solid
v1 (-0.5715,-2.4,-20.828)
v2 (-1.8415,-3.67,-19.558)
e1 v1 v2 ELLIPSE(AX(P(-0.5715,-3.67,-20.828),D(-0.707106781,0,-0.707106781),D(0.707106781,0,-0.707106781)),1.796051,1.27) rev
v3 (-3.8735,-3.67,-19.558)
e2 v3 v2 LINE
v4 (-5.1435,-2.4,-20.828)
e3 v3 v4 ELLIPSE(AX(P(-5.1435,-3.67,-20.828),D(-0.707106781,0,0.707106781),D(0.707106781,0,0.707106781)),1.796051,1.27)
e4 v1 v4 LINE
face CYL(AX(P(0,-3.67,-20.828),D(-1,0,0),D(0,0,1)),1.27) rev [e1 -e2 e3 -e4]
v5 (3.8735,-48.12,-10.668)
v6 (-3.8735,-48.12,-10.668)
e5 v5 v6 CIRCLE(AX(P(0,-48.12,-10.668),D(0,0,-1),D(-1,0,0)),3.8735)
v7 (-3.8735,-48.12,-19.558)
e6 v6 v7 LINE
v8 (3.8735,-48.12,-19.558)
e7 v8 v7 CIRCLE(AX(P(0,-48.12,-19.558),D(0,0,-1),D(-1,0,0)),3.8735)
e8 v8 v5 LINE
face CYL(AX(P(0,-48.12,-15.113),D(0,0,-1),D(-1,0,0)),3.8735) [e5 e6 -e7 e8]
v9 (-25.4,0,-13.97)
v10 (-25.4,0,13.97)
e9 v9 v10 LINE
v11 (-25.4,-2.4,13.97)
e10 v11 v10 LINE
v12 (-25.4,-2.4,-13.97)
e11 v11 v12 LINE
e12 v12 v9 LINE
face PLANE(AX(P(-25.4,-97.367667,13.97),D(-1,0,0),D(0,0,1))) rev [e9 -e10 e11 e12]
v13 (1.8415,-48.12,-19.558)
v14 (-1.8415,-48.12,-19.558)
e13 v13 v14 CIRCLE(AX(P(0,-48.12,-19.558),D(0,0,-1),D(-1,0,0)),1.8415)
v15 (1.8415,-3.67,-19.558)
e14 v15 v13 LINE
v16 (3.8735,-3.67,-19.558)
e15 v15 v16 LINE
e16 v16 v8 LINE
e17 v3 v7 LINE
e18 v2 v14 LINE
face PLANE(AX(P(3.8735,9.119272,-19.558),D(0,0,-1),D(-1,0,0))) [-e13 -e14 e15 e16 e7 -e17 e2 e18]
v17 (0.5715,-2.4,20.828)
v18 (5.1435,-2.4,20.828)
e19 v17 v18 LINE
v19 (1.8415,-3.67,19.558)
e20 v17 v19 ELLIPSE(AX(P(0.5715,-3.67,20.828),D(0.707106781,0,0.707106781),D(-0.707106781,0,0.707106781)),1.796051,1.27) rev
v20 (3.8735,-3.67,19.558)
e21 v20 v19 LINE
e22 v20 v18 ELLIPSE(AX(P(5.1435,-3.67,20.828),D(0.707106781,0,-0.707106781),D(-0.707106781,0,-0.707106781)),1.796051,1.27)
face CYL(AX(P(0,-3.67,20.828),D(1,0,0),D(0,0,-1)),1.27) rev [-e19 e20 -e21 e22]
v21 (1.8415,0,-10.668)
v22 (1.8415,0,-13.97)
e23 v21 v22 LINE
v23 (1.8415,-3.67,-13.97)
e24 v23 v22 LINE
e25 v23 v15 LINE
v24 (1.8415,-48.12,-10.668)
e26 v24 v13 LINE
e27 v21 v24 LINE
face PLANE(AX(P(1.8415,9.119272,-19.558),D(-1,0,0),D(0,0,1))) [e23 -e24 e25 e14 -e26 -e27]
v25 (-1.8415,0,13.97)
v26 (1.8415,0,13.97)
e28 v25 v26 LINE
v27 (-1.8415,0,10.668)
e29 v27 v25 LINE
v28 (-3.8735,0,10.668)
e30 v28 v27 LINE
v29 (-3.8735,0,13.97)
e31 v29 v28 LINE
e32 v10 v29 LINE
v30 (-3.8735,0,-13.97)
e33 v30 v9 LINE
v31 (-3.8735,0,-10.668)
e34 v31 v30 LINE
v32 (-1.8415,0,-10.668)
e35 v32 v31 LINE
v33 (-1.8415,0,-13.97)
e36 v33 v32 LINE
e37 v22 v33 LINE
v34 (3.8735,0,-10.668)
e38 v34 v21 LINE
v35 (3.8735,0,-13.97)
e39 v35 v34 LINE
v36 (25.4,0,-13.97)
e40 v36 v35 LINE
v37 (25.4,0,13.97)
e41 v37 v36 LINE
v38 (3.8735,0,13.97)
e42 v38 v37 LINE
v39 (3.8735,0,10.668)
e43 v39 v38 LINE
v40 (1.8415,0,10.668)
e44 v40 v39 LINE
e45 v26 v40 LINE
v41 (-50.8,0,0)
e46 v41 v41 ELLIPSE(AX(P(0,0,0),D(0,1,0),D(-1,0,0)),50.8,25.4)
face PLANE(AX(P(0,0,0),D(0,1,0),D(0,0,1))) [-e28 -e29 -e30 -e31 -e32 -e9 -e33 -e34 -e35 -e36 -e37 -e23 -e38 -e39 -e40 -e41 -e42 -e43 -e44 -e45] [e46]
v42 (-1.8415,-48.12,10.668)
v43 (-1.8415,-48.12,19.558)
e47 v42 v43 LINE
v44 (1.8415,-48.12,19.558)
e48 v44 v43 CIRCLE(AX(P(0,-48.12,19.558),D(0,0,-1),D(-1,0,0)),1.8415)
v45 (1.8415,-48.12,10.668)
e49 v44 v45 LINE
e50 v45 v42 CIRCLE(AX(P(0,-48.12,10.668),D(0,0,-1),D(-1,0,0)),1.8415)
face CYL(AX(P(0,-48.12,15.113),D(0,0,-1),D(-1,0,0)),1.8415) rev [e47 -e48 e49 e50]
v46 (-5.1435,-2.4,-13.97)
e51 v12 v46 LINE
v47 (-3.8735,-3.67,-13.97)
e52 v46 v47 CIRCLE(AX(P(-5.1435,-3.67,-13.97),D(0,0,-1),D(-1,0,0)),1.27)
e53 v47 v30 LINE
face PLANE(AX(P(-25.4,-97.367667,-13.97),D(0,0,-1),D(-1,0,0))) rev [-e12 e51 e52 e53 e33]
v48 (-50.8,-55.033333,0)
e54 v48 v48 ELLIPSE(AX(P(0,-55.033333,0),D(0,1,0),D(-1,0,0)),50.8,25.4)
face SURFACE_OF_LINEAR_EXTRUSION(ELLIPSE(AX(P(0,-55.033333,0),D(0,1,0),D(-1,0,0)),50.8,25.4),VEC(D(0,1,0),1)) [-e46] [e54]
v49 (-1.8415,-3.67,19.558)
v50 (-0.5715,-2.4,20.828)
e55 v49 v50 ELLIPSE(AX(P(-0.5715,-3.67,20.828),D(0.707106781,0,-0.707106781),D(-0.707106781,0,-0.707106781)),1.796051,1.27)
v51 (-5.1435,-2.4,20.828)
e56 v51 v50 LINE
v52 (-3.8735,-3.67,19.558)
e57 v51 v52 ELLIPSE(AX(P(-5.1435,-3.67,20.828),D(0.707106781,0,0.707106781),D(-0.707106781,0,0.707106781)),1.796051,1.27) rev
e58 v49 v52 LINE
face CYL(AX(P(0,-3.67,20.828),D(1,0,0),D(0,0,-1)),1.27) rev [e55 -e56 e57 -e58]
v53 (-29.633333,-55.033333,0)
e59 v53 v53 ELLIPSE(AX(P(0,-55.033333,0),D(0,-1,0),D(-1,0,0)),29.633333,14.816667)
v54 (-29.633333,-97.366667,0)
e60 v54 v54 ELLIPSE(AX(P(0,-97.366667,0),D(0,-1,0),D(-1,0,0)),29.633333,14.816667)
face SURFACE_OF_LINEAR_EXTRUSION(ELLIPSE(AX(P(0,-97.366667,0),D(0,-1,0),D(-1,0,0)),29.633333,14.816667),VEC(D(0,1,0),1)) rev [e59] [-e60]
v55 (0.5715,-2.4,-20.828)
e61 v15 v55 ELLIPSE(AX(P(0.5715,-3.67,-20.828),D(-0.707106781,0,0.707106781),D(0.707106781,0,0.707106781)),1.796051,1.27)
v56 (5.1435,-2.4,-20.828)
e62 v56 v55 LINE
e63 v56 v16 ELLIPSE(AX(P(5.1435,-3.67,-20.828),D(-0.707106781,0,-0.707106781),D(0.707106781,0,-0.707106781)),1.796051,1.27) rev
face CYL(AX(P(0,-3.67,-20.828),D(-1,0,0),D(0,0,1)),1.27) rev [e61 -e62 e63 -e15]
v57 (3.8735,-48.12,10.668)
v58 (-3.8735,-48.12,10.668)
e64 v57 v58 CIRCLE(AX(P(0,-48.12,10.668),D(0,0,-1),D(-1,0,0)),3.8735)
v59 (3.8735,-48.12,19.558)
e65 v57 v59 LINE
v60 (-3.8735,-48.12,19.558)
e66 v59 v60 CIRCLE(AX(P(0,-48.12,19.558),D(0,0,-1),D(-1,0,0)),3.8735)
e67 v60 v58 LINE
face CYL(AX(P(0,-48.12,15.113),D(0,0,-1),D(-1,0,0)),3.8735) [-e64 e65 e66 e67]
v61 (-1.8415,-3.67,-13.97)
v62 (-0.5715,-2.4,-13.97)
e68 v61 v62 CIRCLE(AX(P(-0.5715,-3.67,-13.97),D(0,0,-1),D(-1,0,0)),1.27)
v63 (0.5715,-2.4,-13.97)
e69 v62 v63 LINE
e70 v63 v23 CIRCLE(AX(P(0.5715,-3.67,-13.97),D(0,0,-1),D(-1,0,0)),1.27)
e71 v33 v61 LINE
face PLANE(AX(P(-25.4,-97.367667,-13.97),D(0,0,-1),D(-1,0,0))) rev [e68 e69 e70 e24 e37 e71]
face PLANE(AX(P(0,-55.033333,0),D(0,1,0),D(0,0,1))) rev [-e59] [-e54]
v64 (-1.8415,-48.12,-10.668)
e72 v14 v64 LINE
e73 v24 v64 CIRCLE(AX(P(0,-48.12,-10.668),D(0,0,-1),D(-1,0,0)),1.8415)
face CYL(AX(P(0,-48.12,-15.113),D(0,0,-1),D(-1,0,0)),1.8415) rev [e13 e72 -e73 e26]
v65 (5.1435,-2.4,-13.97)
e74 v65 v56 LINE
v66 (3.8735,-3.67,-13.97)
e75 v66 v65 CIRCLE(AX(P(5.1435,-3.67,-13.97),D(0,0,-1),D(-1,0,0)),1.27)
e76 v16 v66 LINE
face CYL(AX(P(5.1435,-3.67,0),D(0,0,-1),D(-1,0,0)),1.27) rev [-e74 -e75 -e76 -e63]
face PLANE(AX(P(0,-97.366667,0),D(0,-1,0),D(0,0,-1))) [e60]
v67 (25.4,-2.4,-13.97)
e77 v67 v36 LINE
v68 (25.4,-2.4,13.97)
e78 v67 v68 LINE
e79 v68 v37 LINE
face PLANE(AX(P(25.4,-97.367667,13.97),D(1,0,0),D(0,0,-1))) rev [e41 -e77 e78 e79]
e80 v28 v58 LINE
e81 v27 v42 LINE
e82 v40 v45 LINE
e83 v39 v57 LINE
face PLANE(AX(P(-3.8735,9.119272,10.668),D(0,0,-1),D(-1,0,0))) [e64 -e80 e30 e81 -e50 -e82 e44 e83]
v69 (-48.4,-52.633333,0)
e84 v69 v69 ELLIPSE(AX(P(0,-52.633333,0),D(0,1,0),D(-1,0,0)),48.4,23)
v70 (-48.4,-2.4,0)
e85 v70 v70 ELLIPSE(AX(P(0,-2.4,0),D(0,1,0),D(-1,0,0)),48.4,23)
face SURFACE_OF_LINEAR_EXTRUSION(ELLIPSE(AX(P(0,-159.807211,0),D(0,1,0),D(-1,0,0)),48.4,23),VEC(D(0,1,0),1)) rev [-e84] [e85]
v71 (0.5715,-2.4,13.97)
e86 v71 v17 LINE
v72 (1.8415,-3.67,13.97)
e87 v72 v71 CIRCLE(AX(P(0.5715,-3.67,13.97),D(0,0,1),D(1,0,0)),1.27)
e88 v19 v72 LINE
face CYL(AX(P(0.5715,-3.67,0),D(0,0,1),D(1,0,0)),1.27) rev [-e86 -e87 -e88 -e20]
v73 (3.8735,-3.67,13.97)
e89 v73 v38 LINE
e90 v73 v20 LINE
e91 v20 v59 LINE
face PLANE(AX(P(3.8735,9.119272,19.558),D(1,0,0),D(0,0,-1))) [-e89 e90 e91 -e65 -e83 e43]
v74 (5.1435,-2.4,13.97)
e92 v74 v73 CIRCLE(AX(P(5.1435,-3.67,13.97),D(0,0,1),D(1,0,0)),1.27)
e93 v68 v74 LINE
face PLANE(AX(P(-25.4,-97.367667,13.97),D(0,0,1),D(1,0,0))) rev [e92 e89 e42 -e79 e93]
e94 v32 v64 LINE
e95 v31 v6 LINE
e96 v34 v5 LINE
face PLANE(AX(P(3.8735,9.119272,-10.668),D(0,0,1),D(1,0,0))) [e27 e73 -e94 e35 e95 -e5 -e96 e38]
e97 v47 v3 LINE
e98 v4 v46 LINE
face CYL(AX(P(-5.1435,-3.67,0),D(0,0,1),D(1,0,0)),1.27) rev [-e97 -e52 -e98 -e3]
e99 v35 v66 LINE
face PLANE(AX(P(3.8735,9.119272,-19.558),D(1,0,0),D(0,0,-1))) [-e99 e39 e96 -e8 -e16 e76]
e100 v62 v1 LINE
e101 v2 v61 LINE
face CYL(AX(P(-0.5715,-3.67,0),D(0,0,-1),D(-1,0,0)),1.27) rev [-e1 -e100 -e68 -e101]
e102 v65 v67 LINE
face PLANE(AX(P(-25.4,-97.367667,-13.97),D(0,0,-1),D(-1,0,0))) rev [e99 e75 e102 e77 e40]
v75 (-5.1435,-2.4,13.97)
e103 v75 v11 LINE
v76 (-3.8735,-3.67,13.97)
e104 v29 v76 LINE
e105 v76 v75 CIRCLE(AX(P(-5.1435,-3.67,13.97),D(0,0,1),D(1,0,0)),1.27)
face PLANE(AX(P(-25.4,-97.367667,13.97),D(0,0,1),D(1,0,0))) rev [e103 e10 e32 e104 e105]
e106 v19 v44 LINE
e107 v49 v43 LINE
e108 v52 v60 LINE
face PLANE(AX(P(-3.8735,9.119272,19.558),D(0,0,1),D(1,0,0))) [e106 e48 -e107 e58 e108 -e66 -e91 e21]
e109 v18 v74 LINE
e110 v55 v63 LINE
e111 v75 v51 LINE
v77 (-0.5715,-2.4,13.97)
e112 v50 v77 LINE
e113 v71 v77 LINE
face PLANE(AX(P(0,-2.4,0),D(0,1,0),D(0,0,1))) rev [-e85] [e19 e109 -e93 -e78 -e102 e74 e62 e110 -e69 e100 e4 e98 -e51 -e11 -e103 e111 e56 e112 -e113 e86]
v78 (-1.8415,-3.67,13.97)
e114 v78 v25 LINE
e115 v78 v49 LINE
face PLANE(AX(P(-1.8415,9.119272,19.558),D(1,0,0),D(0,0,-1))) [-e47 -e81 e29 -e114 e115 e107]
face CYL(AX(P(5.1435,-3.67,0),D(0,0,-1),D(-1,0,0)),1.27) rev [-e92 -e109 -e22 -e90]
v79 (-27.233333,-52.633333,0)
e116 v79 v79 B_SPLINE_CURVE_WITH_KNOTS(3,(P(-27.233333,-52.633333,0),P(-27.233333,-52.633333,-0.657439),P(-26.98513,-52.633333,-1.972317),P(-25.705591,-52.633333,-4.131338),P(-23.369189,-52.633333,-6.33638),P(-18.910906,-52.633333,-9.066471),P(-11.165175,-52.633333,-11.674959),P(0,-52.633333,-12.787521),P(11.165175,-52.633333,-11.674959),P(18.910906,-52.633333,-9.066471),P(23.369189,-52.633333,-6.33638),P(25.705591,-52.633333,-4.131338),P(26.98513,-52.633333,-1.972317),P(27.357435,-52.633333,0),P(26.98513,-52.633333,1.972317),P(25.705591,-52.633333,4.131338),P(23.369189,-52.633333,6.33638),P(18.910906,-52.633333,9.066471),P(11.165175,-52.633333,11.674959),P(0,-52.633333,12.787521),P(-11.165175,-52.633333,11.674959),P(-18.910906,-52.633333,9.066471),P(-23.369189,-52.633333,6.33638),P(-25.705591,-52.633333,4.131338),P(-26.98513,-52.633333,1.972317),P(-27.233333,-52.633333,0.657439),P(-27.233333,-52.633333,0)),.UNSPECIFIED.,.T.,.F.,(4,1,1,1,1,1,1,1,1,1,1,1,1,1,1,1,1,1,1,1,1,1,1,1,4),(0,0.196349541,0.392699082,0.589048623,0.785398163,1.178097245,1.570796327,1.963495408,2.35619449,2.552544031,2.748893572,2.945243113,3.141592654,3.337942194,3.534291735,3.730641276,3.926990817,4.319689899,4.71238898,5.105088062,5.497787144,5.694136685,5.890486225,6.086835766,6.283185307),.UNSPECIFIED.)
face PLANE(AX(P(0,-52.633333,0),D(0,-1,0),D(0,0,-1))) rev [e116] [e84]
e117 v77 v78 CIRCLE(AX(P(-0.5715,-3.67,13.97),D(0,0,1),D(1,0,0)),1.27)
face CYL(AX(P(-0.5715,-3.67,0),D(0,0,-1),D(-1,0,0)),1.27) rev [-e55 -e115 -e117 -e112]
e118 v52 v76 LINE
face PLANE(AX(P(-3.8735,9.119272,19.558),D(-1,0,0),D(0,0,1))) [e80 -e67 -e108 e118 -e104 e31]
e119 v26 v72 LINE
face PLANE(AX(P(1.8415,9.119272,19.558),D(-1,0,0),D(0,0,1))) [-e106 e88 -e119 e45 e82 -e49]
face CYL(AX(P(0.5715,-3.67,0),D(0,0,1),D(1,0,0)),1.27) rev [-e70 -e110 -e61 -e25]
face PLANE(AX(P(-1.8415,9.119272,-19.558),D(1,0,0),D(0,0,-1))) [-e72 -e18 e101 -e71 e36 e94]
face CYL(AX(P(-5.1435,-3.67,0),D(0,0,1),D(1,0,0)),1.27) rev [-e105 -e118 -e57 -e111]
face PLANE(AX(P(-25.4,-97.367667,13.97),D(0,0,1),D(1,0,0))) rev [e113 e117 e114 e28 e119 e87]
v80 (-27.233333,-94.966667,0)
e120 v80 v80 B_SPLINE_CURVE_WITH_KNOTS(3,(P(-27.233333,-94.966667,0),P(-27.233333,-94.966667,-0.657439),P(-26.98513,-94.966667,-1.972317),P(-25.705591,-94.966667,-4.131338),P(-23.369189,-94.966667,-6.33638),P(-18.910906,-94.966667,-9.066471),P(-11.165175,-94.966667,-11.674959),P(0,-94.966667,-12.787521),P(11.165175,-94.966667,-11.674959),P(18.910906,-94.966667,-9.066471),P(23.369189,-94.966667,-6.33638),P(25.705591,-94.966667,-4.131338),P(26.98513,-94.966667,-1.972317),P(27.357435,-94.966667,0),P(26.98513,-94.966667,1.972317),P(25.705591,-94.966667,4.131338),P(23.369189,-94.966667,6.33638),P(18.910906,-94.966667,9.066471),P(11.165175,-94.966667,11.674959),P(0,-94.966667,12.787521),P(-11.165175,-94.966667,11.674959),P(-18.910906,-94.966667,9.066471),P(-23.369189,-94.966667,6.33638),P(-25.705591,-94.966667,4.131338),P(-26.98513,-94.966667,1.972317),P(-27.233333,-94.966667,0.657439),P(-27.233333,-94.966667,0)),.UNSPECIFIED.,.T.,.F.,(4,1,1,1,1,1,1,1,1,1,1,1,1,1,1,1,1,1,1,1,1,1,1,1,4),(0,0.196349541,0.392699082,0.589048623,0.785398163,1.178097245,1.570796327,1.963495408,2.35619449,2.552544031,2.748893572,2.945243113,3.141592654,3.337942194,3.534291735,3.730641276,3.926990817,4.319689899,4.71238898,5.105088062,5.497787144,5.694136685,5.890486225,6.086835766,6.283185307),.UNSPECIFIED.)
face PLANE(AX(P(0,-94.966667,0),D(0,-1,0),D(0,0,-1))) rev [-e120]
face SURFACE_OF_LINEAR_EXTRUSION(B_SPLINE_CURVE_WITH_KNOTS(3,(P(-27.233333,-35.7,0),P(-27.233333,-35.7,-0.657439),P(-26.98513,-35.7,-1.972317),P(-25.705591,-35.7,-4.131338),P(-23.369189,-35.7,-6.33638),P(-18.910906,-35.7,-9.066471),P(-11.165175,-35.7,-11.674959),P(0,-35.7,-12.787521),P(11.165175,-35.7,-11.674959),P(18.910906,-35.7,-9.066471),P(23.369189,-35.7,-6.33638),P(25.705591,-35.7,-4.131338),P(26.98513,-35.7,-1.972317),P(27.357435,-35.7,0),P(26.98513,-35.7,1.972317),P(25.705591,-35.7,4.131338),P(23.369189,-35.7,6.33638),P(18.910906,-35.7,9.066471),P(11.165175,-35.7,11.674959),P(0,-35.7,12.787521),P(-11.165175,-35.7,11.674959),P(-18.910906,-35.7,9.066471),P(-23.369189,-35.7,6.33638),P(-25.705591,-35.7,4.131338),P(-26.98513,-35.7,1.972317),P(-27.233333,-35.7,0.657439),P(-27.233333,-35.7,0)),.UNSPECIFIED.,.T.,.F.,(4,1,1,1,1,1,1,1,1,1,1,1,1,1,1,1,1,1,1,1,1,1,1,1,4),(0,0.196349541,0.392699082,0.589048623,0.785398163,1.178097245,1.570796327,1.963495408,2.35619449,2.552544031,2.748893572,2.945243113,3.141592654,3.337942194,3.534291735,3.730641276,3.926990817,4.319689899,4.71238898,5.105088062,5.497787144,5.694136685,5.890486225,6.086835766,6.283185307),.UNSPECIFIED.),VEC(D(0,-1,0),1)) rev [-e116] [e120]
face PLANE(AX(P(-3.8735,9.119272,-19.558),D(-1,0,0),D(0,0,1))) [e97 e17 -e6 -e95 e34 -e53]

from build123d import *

# Parameters (mm, degrees)
SKETCH3_RX          = 50.8
SKETCH3_RY          = 25.4
BOSS_EXTRUDE1_DEPTH = 55.033333333
SKETCH4_RX          = 29.633333333
SKETCH4_RY          = 14.816666667
BOSS_EXTRUDE2_DEPTH = 42.333333249
CUT_EXTRUDE1_START  = -50.233333
SKETCH5_RX          = 48.4
SKETCH5_RY          = 23
CUT_EXTRUDE1_DEPTH  = 50.233333
CUT_EXTRUDE2_START  = -42.333333249
CUT_EXTRUDE2_DEPTH  = 42.333333249
CUT_EXTRUDE3_REACH  = 114.721
SKETCH7_W           = 50.8
SKETCH7_H           = 27.94
BOSS_EXTRUDE3_START = -2.4
SKETCH8_W           = 2.032
SKETCH8_H           = 8.89
BOSS_EXTRUDE3_DEPTH = 48.12
SKETCH11_W          = 2.032
SKETCH11_H          = 8.89
FILLET1_R           = 1.27


# Read off the part's stored shape, not the designer's step: Cut-Extrude2
with BuildPart() as part:
    # Sketch3 → Boss-Extrude1 (new body)
    with BuildSketch(Plane(origin=(0, 0, 0), x_dir=(1, 0, 0), z_dir=(0, 1, 0))):
        with Locations(Location((0, 0), (0, 0, 180))):
            Ellipse(SKETCH3_RX, SKETCH3_RY)
    extrude(amount=-BOSS_EXTRUDE1_DEPTH)

    # Sketch4 → Boss-Extrude2 (add)
    with BuildSketch(Plane.XZ.offset(55.033333333)):
        with Locations(Location((0, 0), (0, 0, 180))):
            Ellipse(SKETCH4_RX, SKETCH4_RY)
    extrude(amount=BOSS_EXTRUDE2_DEPTH)

    # Sketch5 → Cut-Extrude1 (cut)
    with BuildSketch(Plane(origin=(0, -2.400000026, 0), x_dir=(1, 0, 0), z_dir=(0, 1, 0)).offset(CUT_EXTRUDE1_START)):
        with Locations(Location((0, 0), (0, 0, -180))):
            Ellipse(SKETCH5_RX, SKETCH5_RY)
    extrude(amount=CUT_EXTRUDE1_DEPTH, mode=Mode.SUBTRACT)

    # Cut-Extrude2 outline → Cut-Extrude2 (cut)
    with BuildSketch(Plane(origin=(0, -94.966666556, 0), x_dir=(-1, 0, 0), z_dir=(0, -1, 0)).offset(CUT_EXTRUDE2_START)):
        with BuildLine():
            add(Edge.make_bspline(
                [(27.233333333, 0), (27.233333333, 0.65743884), (26.985129844, 1.972316519), (25.705591313, 4.131337933), (23.369189189, 6.336380478), (18.910906022, 9.066471368), (11.165174658, 11.674958543), (0, 12.787520729), (-11.165174658, 11.674958543), (-18.910906022, 9.066471368), (-23.369189189, 6.336380478), (-25.705591313, 4.131337933), (-26.985129844, 1.972316519), (-27.357435078, 0), (-26.985129844, -1.972316519), (-25.705591313, -4.131337933), (-23.369189189, -6.336380478), (-18.910906022, -9.066471368), (-11.165174658, -11.674958543), (0, -12.787520729), (11.165174658, -11.674958543), (18.910906022, -9.066471368), (23.369189189, -6.336380478), (25.705591313, -4.131337933), (26.985129844, -1.972316519), (27.233333333, -0.65743884), (27.233333333, 0)],
                knots=[0, 0, 0, 0, 0.196349541, 0.392699082, 0.589048623, 0.785398163, 1.178097245, 1.570796327, 1.963495408, 2.35619449, 2.552544031, 2.748893572, 2.945243113, 3.141592654, 3.337942194, 3.534291735, 3.730641276, 3.926990817, 4.319689899, 4.71238898, 5.105088062, 5.497787144, 5.694136685, 5.890486225, 6.086835766, 6.283185307, 6.283185307, 6.283185307, 6.283185307], degree=3))
        make_face()
    extrude(amount=CUT_EXTRUDE2_DEPTH, mode=Mode.SUBTRACT)

    # Sketch7 → Cut-Extrude3 (cut, up to next)
    with BuildSketch(Plane(origin=(0, 0, 0), x_dir=(1, 0, 0), z_dir=(0, 1, 0)), mode=Mode.PRIVATE) as cut_extrude3_sk1:
        Rectangle(SKETCH7_W, SKETCH7_H)
    cut_extrude3_tool1 = extrude(cut_extrude3_sk1.sketch, amount=-CUT_EXTRUDE3_REACH, mode=Mode.PRIVATE) & part.part
    add(cut_extrude3_tool1.solids().sort_by_distance((0, 0, 0))[0], mode=Mode.SUBTRACT)

    # Sketch8 → Boss-Extrude3 (add)
    with BuildSketch(Plane.XZ.offset(2.400000026).offset(BOSS_EXTRUDE3_START)):
        with Locations((-2.8575, 15.113)):
            Rectangle(SKETCH8_W, SKETCH8_H)
        with Locations((2.8575, 15.113)):
            Rectangle(SKETCH8_W, SKETCH8_H)
        with Locations((2.8575, -15.113)):
            Rectangle(SKETCH8_W, SKETCH8_H)
        with Locations((-2.8575, -15.113)):
            Rectangle(SKETCH8_W, SKETCH8_H)
    extrude(amount=BOSS_EXTRUDE3_DEPTH)

    # Sweep2: sweep along a path in Sketch10
    with BuildLine(Plane(origin=(0, 0, 15.113), x_dir=(-1, 0, 0), z_dir=(0, 0, -1))) as sweep2_path:
        ThreePointArc((-2.8575, -48.120000026), (0, -50.977500026), (2.8575, -48.120000026))
    # Sketch11 → Sweep2 (sweep)
    with BuildSketch(Plane.XZ.offset(48.120000026)):
        with Locations((-2.8575, 15.113)):
            Rectangle(SKETCH11_W, SKETCH11_H)
    sweep2 = sweep(path=sweep2_path.line)

    # Mirror2: Sweep2 across plane
    add(sweep2.mirror(Plane.XY))

    # Fillet1
    fillet1_edges = [part.edges().sort_by_distance(p)[0] for p in [
        (-2.8575, -2.400000026, 19.558),
        (-3.8735, -2.400000026, 16.764),
        (-1.8415, -2.400000026, 16.764),
        (2.8575, -2.400000026, 19.558),
        (1.8415, -2.400000026, 16.764),
        (3.8735, -2.400000026, 16.764),
        (1.8415, -2.400000026, -16.764),
        (2.8575, -2.400000026, -19.558),
        (3.8735, -2.400000026, -16.764),
        (-2.8575, -2.400000026, -19.558),
        (-1.8415, -2.400000026, -16.764),
        (-3.8735, -2.400000026, -16.764),
    ]]
    fillet(fillet1_edges, radius=FILLET1_R)


solid = part.part
